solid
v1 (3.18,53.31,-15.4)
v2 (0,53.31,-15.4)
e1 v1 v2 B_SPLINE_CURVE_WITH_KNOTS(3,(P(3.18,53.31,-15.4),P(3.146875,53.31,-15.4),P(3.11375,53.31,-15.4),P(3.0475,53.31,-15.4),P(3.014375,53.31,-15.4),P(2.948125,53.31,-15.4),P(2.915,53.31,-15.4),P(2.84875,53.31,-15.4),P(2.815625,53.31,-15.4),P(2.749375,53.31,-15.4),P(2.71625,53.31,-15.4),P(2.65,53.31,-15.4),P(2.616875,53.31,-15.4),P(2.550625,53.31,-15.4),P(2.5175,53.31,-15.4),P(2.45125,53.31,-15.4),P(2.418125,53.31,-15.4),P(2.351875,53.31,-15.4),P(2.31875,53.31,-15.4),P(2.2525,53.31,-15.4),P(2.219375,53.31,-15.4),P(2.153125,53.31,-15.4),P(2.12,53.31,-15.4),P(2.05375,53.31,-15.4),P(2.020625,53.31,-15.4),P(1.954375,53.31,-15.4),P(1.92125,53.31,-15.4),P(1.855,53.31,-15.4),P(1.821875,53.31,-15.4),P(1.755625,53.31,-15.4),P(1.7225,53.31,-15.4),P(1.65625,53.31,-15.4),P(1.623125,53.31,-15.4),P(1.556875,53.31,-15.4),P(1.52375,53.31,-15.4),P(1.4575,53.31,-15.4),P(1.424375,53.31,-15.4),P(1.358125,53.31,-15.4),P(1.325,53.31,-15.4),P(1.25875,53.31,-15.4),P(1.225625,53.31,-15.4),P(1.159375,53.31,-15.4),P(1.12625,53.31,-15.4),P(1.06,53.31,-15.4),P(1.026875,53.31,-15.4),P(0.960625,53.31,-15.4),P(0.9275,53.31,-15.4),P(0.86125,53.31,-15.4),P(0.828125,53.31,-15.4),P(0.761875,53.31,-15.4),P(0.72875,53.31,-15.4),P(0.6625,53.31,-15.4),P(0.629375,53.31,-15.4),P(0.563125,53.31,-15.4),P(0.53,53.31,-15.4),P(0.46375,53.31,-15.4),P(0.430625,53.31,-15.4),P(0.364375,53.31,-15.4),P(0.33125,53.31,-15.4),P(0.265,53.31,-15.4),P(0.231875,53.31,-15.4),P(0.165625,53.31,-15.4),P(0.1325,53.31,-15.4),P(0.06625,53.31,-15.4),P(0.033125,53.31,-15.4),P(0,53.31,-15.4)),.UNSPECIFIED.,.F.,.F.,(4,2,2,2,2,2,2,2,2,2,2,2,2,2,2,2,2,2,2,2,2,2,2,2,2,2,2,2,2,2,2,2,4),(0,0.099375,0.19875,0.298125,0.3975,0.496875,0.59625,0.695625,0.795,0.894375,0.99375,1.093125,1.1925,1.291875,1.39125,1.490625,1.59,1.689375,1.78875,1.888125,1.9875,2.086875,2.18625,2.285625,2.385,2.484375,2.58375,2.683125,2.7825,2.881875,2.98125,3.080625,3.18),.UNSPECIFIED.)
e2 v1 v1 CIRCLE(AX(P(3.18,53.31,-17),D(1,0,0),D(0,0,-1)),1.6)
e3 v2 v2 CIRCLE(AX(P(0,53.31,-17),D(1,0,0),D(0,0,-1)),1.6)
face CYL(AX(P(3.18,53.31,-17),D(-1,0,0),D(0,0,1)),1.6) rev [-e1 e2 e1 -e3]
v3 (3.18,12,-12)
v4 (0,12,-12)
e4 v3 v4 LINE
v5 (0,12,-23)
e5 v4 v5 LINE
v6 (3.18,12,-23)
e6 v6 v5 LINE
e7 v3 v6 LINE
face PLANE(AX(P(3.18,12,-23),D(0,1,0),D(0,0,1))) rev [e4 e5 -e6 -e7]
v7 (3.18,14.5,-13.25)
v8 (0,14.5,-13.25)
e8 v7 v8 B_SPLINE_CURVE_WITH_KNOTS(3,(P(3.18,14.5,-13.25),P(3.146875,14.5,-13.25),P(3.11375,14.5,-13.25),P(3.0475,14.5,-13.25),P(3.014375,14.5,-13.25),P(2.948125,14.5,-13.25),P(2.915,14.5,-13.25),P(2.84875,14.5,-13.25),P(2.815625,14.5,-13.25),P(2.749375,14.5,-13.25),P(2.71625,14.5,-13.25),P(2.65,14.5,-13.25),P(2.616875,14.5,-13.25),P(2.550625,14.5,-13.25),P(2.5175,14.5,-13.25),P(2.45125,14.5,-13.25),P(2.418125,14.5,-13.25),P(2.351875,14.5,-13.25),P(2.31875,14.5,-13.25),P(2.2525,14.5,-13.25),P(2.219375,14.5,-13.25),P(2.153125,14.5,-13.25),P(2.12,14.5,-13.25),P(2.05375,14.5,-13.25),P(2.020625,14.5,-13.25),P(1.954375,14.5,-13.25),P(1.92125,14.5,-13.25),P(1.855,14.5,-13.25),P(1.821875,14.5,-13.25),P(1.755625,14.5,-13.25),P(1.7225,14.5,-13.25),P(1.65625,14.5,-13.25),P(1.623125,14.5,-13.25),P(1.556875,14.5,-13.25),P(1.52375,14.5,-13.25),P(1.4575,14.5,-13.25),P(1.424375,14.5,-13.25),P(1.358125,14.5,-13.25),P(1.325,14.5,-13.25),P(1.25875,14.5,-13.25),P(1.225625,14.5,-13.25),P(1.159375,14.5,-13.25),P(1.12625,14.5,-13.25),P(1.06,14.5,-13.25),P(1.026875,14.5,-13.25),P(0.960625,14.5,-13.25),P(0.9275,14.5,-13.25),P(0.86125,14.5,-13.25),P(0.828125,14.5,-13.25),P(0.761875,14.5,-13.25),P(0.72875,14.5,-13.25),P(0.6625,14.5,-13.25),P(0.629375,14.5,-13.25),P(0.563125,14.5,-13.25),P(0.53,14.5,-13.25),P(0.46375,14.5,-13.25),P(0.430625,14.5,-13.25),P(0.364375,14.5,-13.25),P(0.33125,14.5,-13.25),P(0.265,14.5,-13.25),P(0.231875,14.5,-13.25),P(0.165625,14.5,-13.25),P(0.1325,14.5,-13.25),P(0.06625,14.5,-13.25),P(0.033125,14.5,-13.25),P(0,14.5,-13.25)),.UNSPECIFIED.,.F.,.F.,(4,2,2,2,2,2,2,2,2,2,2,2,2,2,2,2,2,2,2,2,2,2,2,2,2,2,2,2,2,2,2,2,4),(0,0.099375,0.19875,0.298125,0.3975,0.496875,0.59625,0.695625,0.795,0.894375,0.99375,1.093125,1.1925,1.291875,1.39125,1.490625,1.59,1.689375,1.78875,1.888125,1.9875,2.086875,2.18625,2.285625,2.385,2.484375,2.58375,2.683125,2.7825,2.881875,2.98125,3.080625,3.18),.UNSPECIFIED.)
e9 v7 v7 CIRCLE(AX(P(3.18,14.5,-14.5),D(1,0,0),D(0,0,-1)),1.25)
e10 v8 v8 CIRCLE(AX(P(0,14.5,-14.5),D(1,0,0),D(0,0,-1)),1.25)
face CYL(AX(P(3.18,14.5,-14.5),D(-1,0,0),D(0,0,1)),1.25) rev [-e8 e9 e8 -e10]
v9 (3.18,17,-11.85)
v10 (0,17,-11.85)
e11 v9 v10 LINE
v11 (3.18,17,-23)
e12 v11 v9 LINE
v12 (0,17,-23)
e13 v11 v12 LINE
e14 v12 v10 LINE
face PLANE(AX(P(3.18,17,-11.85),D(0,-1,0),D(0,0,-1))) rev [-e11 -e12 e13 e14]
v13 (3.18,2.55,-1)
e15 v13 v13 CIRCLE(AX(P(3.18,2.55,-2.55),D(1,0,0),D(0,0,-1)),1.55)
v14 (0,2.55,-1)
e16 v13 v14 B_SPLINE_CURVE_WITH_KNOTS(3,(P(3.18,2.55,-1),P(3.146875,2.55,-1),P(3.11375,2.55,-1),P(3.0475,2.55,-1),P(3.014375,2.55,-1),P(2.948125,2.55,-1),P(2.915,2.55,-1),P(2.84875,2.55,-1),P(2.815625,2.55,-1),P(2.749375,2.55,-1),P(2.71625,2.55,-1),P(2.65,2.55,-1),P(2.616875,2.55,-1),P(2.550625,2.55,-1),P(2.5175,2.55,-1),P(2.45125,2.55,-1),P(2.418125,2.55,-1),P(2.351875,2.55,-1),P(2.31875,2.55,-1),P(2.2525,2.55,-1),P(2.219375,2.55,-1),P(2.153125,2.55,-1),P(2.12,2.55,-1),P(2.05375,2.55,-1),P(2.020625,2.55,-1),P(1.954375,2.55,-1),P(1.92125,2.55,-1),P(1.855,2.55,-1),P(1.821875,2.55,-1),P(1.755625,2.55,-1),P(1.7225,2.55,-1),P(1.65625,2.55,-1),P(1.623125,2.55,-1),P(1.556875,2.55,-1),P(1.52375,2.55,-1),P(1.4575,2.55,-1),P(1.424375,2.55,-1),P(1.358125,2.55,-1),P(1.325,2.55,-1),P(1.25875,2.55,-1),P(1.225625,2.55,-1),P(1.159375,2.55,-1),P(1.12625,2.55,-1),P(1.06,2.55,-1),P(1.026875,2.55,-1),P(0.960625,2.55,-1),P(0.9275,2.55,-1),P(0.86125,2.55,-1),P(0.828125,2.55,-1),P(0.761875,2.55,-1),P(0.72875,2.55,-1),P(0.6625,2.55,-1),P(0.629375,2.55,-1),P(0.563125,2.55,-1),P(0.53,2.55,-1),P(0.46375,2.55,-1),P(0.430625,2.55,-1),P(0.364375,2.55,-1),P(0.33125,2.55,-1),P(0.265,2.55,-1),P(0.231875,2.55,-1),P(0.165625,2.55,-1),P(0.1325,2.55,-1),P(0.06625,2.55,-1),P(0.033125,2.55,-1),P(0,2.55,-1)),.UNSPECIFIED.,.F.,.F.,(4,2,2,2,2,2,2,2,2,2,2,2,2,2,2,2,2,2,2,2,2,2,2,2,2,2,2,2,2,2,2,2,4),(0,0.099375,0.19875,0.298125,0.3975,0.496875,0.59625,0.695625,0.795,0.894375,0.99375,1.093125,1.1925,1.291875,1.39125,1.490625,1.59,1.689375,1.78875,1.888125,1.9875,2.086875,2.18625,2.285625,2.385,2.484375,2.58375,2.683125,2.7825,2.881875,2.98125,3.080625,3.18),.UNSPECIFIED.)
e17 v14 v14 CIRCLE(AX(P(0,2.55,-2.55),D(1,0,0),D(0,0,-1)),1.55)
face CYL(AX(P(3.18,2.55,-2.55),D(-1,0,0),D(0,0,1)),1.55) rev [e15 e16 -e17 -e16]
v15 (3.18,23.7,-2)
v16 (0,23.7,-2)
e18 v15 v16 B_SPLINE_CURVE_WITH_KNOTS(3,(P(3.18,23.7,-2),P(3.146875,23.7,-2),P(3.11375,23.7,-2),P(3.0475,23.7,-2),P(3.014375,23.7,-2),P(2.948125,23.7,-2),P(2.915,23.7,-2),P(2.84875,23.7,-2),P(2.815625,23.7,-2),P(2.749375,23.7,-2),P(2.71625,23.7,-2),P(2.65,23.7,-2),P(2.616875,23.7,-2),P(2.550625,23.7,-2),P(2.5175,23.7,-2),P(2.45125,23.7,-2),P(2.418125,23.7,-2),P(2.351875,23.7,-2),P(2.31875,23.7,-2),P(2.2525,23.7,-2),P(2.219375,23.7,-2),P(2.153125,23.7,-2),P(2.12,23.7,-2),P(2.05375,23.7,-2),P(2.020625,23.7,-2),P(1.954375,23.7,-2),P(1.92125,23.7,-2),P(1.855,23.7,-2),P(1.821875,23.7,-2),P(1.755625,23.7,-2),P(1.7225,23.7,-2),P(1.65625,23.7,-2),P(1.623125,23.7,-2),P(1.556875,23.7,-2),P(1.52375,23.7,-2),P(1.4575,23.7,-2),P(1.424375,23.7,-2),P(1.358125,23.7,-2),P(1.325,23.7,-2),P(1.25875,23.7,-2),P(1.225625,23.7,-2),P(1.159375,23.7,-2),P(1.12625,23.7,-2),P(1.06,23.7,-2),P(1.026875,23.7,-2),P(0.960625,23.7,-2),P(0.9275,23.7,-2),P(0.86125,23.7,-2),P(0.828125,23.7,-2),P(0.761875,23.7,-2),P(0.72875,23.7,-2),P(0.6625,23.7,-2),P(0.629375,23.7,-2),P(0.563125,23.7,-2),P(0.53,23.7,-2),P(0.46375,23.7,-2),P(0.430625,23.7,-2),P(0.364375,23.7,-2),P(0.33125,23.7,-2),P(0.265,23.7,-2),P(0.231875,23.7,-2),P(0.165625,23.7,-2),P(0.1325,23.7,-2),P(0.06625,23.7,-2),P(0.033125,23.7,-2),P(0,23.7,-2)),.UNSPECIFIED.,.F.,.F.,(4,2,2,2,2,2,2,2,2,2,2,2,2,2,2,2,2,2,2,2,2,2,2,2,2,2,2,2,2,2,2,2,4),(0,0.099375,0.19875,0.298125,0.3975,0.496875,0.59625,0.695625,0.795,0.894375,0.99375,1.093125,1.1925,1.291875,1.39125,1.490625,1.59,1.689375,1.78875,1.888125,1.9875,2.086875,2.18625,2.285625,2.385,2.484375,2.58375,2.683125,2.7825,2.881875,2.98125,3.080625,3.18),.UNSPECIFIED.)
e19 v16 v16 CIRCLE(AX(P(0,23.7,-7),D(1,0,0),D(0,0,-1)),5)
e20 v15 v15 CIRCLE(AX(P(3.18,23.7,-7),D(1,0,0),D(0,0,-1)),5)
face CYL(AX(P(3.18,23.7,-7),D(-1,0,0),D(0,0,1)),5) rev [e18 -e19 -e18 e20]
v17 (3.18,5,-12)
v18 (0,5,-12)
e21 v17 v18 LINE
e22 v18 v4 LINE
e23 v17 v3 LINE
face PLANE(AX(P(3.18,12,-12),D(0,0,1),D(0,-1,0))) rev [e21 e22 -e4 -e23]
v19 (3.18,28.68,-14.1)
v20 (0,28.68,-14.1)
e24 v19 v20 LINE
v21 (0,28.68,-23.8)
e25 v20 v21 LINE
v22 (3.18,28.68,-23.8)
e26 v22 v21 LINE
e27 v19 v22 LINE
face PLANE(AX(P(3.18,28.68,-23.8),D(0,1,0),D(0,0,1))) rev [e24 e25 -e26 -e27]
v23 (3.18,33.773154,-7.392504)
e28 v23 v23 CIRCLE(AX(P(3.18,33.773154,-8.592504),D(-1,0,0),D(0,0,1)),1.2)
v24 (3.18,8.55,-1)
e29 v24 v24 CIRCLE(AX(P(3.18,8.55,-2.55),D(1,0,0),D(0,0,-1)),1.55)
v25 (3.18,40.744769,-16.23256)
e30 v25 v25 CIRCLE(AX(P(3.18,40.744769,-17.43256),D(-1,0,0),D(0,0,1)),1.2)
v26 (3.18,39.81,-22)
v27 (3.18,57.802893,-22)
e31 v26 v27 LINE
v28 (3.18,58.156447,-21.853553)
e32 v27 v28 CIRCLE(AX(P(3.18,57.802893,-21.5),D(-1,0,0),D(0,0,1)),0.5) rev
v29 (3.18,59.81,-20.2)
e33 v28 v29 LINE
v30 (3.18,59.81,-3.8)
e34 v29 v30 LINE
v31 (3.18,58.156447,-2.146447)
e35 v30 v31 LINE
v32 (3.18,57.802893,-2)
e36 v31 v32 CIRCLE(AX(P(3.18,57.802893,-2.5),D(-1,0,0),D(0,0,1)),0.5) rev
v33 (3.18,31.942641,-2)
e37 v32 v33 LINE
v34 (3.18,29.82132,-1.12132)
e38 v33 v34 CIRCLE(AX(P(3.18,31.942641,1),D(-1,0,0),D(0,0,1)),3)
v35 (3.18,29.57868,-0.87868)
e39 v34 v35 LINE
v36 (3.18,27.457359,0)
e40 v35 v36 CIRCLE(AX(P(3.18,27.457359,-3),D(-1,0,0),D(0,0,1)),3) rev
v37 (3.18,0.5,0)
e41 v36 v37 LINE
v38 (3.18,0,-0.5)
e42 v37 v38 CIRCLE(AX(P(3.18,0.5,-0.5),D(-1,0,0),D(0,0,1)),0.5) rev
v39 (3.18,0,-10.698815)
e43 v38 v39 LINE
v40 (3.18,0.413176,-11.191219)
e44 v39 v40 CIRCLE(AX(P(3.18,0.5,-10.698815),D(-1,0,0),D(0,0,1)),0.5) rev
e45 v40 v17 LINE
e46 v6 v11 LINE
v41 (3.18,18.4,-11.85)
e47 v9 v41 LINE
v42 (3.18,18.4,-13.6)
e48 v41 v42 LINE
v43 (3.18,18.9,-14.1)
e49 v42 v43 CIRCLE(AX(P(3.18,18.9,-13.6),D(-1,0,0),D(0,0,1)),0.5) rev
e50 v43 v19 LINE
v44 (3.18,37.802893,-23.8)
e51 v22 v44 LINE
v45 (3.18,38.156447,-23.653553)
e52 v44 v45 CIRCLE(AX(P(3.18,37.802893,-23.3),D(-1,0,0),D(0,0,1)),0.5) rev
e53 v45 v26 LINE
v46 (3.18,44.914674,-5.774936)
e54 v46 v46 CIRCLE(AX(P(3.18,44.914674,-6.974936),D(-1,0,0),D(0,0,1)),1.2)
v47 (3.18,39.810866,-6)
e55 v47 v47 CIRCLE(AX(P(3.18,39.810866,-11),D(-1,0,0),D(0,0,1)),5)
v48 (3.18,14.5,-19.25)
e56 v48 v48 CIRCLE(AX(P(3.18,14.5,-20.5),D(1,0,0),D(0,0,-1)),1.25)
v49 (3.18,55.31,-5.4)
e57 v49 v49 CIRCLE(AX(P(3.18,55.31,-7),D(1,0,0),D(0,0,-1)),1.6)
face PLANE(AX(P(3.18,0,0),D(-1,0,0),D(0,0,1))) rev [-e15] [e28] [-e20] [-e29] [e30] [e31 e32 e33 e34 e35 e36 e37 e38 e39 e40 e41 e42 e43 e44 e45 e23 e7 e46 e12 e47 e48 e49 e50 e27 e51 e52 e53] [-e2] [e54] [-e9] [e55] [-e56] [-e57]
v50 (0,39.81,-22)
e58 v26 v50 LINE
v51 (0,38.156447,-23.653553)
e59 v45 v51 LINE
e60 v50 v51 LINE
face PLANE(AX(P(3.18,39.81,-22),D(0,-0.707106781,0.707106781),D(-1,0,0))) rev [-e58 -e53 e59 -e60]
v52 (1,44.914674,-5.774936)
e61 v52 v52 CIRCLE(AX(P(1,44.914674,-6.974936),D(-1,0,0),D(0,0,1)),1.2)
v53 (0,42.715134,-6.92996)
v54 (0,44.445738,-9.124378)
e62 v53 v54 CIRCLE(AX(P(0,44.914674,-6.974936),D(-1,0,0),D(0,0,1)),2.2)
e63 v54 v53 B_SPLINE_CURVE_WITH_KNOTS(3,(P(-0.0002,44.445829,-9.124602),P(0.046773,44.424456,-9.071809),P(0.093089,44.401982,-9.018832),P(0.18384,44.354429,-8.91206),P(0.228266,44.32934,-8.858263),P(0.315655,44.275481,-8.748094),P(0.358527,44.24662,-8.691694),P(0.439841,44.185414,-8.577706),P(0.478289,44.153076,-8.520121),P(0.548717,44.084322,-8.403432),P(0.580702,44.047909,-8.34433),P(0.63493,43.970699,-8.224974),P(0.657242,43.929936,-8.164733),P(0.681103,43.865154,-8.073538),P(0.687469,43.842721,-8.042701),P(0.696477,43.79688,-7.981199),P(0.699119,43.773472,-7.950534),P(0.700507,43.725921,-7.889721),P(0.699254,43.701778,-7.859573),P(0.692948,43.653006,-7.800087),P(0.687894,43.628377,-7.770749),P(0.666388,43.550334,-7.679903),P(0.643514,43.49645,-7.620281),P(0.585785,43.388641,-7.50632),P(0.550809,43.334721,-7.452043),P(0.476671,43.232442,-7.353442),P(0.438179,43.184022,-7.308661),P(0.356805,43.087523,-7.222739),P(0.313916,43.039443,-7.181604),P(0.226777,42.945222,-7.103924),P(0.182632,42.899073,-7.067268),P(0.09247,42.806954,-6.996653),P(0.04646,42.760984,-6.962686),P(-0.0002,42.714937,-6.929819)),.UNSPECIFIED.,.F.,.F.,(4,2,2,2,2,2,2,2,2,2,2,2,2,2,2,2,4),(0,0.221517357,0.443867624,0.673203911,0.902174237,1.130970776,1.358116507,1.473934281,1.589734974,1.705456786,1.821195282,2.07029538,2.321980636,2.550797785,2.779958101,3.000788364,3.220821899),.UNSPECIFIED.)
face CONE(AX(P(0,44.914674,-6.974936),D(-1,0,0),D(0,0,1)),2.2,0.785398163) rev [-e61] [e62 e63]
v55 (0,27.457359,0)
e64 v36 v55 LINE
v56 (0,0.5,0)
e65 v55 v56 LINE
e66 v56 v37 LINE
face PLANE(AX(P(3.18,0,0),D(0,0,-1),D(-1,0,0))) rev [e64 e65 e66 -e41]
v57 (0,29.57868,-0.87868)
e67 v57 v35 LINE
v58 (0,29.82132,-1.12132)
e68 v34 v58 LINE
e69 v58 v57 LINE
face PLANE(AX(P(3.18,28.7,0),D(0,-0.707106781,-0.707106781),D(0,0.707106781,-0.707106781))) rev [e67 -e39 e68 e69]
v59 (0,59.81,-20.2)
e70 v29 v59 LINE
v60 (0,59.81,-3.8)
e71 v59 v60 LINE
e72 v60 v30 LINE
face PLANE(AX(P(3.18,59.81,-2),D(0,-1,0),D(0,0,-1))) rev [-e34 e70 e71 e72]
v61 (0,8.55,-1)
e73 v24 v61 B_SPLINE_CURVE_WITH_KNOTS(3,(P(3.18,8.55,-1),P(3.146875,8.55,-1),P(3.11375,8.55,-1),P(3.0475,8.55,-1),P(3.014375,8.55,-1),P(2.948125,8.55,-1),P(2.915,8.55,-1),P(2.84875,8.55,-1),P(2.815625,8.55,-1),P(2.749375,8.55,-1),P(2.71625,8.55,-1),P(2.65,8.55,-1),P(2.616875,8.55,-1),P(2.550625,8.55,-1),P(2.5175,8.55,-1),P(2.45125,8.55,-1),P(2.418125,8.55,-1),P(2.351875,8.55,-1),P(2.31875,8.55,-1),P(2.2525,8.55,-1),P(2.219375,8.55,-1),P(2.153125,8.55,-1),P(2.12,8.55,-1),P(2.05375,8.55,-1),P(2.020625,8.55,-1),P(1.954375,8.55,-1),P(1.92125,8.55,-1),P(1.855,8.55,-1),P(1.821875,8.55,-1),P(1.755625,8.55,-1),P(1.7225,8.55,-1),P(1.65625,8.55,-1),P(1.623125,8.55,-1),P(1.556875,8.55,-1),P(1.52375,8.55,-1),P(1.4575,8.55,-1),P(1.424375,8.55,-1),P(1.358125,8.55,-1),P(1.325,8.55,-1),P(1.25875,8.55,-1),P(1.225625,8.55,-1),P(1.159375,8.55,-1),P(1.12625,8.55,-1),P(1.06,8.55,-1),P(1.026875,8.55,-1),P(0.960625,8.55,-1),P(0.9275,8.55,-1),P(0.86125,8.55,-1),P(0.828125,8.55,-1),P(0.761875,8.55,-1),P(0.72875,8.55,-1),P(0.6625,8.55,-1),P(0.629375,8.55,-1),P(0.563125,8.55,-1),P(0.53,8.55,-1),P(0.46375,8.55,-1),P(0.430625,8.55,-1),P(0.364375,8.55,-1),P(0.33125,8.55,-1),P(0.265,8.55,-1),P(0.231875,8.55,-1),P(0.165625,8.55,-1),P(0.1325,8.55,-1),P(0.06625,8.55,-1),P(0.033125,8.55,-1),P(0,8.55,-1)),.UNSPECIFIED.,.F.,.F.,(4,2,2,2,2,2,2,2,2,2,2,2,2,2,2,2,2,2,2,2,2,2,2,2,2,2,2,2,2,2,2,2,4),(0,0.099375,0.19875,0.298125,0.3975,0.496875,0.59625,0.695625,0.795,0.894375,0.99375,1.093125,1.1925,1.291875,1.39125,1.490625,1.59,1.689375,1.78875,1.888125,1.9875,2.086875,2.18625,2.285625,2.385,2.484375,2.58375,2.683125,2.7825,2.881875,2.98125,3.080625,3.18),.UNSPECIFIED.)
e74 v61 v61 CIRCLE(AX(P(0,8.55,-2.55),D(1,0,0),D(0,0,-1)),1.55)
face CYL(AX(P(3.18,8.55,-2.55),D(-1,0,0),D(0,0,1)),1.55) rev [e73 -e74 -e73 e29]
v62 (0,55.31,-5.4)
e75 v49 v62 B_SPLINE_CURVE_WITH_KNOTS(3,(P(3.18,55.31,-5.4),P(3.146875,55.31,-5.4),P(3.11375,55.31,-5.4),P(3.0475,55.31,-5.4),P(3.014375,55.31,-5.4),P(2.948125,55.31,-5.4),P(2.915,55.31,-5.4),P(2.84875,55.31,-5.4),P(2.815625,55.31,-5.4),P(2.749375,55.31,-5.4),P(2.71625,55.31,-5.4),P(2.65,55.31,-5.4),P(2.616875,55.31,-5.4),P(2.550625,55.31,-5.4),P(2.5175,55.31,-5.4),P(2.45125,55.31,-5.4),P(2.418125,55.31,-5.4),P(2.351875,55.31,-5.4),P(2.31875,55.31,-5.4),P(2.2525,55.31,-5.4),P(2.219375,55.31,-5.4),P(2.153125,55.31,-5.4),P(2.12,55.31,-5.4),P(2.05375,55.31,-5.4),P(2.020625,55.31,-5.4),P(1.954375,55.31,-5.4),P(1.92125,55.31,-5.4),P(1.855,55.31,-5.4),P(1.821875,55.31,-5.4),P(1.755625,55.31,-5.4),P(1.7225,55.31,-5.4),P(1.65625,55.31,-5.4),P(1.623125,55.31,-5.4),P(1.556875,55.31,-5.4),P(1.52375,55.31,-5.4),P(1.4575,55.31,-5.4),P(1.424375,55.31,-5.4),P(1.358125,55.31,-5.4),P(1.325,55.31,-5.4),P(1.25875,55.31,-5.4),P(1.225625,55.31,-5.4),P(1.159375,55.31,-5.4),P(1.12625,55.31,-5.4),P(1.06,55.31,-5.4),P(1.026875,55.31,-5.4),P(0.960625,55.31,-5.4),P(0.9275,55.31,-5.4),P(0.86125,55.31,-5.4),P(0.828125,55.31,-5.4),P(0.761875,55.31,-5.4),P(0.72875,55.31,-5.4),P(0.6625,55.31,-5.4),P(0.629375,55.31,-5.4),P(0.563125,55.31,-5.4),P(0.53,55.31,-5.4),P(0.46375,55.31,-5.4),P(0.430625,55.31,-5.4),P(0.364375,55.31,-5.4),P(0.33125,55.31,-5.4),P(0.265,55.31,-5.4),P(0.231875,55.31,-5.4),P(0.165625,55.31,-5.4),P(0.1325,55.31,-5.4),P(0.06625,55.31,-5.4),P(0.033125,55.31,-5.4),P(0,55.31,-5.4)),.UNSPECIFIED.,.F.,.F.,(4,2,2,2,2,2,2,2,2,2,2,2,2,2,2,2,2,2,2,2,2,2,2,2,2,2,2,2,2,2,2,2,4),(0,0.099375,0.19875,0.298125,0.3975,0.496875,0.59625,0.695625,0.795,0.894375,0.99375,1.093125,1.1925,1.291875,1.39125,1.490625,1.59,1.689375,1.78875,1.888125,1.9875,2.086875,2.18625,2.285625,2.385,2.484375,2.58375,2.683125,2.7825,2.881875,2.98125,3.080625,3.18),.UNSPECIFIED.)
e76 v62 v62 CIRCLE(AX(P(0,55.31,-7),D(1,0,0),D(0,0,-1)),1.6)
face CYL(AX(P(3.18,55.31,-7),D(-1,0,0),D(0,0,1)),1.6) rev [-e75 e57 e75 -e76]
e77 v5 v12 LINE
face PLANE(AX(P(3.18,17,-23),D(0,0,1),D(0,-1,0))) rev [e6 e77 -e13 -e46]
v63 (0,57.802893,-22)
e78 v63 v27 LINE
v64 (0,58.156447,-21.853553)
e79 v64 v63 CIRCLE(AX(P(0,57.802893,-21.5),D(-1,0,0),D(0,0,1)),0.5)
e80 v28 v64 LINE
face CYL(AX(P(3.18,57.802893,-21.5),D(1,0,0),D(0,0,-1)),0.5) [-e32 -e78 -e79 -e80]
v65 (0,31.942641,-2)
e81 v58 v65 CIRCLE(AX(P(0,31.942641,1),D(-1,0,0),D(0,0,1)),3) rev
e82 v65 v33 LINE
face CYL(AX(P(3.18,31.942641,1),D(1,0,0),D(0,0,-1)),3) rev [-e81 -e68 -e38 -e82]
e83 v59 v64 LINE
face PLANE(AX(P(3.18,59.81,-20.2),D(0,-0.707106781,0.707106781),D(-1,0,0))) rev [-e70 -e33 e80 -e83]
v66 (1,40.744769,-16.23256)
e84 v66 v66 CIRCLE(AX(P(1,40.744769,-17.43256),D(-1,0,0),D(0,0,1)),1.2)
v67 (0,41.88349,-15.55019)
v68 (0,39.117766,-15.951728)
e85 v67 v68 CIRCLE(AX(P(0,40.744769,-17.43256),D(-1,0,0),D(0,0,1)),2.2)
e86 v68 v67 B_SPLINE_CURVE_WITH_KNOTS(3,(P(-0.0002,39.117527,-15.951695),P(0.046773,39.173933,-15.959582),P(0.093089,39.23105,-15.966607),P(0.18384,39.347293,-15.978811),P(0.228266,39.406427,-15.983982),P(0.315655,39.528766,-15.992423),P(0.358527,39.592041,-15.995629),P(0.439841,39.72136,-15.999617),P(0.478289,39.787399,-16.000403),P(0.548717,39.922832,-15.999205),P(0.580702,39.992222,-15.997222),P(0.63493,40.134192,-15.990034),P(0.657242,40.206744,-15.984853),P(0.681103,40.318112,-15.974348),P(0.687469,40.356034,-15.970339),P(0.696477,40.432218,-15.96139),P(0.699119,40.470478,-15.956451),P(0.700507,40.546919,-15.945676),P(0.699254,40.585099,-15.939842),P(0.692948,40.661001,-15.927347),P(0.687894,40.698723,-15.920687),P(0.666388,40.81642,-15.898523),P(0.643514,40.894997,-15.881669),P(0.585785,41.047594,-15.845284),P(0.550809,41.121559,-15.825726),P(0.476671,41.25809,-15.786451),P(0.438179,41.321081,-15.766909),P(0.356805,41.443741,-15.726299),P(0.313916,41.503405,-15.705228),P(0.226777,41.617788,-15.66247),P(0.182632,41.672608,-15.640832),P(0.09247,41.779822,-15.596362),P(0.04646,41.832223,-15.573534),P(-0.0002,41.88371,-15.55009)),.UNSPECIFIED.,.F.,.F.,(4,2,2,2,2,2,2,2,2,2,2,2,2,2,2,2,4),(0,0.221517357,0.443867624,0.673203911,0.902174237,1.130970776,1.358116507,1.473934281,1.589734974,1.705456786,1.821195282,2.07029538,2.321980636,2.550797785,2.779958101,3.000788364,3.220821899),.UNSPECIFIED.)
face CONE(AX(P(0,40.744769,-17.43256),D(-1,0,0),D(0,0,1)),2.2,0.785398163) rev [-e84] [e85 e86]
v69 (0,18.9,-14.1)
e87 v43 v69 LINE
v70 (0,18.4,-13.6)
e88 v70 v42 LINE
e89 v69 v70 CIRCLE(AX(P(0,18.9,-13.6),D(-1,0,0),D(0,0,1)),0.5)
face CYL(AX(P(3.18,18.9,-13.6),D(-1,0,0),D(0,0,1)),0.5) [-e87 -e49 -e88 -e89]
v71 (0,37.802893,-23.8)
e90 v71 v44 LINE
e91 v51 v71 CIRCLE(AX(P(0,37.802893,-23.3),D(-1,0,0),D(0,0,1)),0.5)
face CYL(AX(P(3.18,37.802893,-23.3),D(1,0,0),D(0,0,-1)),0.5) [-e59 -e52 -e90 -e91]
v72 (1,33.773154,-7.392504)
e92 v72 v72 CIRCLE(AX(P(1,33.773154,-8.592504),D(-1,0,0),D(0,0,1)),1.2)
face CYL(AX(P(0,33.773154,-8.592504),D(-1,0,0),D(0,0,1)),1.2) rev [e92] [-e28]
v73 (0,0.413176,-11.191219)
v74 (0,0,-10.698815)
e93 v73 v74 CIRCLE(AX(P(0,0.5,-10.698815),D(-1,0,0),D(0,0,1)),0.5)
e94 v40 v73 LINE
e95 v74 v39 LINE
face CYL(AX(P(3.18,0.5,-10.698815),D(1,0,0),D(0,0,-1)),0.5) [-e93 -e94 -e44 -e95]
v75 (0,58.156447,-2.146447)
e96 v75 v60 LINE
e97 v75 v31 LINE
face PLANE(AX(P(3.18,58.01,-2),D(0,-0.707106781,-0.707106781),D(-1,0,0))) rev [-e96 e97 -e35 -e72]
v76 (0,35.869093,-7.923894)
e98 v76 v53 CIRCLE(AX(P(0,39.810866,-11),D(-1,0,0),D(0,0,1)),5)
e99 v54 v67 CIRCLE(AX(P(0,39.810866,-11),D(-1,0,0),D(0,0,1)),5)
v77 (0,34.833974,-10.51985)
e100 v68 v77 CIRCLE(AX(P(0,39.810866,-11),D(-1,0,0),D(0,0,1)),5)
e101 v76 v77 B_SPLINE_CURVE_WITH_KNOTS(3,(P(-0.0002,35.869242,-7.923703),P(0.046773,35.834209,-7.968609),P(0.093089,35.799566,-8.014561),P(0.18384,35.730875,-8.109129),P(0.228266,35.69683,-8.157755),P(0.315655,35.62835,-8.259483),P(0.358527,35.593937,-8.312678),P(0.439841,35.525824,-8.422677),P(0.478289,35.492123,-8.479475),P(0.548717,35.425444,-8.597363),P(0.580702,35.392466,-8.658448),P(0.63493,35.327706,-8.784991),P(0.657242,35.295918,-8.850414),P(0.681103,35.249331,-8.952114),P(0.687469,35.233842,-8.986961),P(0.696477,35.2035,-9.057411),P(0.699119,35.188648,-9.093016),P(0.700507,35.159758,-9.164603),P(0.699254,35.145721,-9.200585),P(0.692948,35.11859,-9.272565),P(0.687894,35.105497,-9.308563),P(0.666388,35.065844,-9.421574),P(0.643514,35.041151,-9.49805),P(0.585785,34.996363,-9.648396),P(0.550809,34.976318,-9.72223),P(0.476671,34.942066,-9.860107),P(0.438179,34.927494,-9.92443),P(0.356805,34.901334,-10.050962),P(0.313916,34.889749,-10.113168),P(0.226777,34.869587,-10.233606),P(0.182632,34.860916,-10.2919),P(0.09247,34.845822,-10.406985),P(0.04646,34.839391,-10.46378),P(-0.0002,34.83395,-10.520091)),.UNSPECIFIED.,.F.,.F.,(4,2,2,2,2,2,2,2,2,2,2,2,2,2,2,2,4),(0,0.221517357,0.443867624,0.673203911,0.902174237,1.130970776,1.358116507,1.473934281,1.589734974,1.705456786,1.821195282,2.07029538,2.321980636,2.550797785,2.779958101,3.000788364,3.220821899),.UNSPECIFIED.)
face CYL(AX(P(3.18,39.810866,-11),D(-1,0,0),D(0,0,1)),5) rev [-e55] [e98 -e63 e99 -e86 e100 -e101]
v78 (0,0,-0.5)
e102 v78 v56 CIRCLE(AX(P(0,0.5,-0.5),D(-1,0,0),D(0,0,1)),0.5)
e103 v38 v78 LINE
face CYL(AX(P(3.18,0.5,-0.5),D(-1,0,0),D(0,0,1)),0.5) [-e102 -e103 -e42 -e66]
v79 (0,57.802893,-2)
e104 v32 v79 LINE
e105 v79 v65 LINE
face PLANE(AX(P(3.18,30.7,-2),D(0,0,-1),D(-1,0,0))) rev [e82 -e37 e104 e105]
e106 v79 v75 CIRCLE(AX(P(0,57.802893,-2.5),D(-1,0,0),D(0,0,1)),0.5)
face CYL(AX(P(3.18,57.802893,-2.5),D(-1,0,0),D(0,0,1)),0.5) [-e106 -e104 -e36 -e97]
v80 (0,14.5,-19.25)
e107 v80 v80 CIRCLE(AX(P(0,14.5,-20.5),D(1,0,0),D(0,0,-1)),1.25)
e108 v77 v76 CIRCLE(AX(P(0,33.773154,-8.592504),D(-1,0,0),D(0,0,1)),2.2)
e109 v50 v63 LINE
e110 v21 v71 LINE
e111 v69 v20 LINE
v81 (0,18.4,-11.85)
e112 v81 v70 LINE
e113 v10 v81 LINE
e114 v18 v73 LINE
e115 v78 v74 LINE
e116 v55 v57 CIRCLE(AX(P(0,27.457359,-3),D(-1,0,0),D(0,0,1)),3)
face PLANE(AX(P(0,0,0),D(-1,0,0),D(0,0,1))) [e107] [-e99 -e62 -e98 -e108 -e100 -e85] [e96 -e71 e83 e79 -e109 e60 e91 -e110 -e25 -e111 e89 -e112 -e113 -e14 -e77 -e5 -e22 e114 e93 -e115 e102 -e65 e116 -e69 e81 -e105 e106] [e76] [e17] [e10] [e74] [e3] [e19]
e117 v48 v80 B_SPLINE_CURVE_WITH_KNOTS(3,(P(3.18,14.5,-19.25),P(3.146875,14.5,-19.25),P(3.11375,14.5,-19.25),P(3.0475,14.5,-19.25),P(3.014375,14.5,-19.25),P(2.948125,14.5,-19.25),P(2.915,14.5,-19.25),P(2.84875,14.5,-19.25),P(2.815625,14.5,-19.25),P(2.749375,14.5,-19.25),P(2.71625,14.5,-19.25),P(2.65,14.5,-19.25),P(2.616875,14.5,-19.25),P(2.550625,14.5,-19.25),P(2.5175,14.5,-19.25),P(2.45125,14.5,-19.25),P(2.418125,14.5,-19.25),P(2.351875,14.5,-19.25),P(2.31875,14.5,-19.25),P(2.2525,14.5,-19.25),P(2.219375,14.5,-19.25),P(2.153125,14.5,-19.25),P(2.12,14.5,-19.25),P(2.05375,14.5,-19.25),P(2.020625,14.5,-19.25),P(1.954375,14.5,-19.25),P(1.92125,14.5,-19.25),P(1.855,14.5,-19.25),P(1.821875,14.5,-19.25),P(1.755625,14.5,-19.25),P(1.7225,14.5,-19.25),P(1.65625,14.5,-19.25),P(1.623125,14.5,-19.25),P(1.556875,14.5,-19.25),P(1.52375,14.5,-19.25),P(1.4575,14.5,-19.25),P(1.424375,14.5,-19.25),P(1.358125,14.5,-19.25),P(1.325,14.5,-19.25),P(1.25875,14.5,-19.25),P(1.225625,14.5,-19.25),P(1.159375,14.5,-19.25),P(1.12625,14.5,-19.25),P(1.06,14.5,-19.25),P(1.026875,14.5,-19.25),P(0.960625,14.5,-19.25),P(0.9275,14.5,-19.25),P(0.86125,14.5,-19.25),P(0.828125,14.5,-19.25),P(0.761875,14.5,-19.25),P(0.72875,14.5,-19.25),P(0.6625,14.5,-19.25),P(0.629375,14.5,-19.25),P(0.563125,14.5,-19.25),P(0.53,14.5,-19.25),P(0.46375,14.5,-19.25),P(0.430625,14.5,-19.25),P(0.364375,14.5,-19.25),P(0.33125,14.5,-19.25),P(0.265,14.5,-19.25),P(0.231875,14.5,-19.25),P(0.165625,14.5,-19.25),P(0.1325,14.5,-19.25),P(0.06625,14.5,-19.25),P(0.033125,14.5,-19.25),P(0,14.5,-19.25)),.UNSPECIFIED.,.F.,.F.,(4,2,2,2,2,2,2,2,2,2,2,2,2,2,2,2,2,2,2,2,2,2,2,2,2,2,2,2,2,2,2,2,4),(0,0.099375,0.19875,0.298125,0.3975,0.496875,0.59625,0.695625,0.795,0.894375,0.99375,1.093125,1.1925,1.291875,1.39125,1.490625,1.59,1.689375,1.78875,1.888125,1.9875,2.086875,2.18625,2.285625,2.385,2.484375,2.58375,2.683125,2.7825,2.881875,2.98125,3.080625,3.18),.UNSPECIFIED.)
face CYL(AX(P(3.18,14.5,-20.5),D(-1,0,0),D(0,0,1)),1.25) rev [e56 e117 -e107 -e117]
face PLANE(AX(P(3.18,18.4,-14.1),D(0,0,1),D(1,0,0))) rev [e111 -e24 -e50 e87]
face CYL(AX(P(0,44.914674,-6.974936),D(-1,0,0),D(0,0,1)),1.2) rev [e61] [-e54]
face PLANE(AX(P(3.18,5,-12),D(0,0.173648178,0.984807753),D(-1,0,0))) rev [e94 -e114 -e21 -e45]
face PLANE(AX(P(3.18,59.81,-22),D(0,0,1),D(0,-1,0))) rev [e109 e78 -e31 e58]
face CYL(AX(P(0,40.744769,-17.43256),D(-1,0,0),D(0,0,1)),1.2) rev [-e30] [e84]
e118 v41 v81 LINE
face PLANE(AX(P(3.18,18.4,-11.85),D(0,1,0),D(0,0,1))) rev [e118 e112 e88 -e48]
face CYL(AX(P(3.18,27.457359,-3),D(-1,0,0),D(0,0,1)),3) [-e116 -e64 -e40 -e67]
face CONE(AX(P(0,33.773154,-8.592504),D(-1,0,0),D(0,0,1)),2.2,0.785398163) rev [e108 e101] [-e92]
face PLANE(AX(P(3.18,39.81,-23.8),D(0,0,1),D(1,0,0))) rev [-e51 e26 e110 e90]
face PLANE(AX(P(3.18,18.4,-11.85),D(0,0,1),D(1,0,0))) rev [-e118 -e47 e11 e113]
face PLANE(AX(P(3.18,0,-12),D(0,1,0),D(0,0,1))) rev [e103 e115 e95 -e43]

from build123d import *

# Parameters (mm, degrees)
SKETCH1_R                                       = 5
SKETCH1_R_2                                     = 1.6
SKETCH1_R_3                                     = 1.25
SKETCH1_R_4                                     = 1.55
BOSS_EXTRUDE1_DEPTH                             = 3.18
CHAMFER1_SIZE                                   = 5
CHAMFER1_SIZE2                                  = 0.881634904
CSK_FOR_M2_FLAT_HEAD_MACHINE_SCREW1_D           = 2.4
CSK_FOR_M2_FLAT_HEAD_MACHINE_SCREW1_DEPTH       = 3.508967257
CSK_FOR_M2_FLAT_HEAD_MACHINE_SCREW1_CSINK_D     = 4.4
CSK_FOR_M2_FLAT_HEAD_MACHINE_SCREW1_CSINK_ANGLE = 90
CSK_FOR_M2_FLAT_HEAD_MACHINE_SCREW1_TIP         = 0.721032743
SKETCH3_R                                       = 5
CUT_EXTRUDE4_DEPTH                              = 65.449891389
FILLET2_R                                       = 3
CHAMFER2_SIZE                                   = 1.8
FILLET4_R                                       = 0.5


with BuildPart() as part:
    # Sketch1 → Boss-Extrude1 (new body)
    with BuildSketch(Plane(origin=(0, 0, 0), x_dir=(0, 0, -1), z_dir=(1, 0, 0))):
        Polygon((0, 0), (0, 28.7), (2, 30.7), (2, 59.81), (22, 59.81), (22, 39.81), (23.8, 39.81), (23.8, 28.68), (14.1, 28.68), (14.1, 18.4), (11.85, 18.4), (11.85, 17), (23, 17), (23, 12), (12, 12), (12, 0), align=None)
        with Locations(Location((7, 23.7, 0), (0, 0, 180))):
            Circle(SKETCH1_R, mode=Mode.SUBTRACT)
        with Locations(Location((7, 55.31, 0), (0, 0, 180))):
            Circle(SKETCH1_R_2, mode=Mode.SUBTRACT)
        with Locations(Location((17, 53.31, 0), (0, 0, 180))):
            Circle(SKETCH1_R_2, mode=Mode.SUBTRACT)
        with Locations(Location((20.5, 14.5, 0), (0, 0, 180))):
            Circle(SKETCH1_R_3, mode=Mode.SUBTRACT)
        with Locations(Location((14.5, 14.5, 0), (0, 0, 180))):
            Circle(SKETCH1_R_3, mode=Mode.SUBTRACT)
        with Locations(Location((2.55, 2.55, 0), (0, 0, 180))):
            Circle(SKETCH1_R_4, mode=Mode.SUBTRACT)
        with Locations(Location((2.55, 8.55, 0), (0, 0, 180))):
            Circle(SKETCH1_R_4, mode=Mode.SUBTRACT)
    extrude(amount=BOSS_EXTRUDE1_DEPTH)

    # Chamfer1
    chamfer1_edges = [part.edges().sort_by_distance(p)[0] for p in [
        (1.59, 0, -12),
    ]]
    chamfer1_side = [part.faces().sort_by_distance(p)[0] for p in [
        (1.59, 6, -12),
    ]]
    chamfer(chamfer1_edges, length=CHAMFER1_SIZE, length2=CHAMFER1_SIZE2, reference=chamfer1_side[0])

    # CSK for M2 Flat Head Machine Screw1
    with Locations(Plane.ZY):
        with Locations((-6.974936087, 44.914674329), (-17.432559713, 40.744769284), (-8.592504199, 33.773154083)):
            CounterSinkHole(CSK_FOR_M2_FLAT_HEAD_MACHINE_SCREW1_D / 2, CSK_FOR_M2_FLAT_HEAD_MACHINE_SCREW1_CSINK_D / 2, depth=CSK_FOR_M2_FLAT_HEAD_MACHINE_SCREW1_DEPTH, counter_sink_angle=CSK_FOR_M2_FLAT_HEAD_MACHINE_SCREW1_CSINK_ANGLE)
            with Locations((0, 0, -(CSK_FOR_M2_FLAT_HEAD_MACHINE_SCREW1_DEPTH + CSK_FOR_M2_FLAT_HEAD_MACHINE_SCREW1_TIP / 2))):  # 118° drill point
                Cone(0, CSK_FOR_M2_FLAT_HEAD_MACHINE_SCREW1_D / 2, CSK_FOR_M2_FLAT_HEAD_MACHINE_SCREW1_TIP, mode=Mode.SUBTRACT)

    # Sketch3 → Cut-Extrude4 (cut, through all)
    with BuildSketch(Plane.ZY):
        with Locations((-11, 39.810865899)):
            Circle(SKETCH3_R)
    extrude(amount=-CUT_EXTRUDE4_DEPTH, mode=Mode.SUBTRACT)

    # Fillet2
    fillet2_edges = [part.edges().sort_by_distance(p)[0] for p in [
        (1.59, 28.7, 0),
        (1.59, 30.7, -2),
    ]]
    fillet(fillet2_edges, radius=FILLET2_R)

    # Chamfer2
    chamfer2_edges = [part.edges().sort_by_distance(p)[0] for p in [
        (1.59, 59.81, -22),
        (1.59, 59.81, -2),
        (1.59, 39.81, -23.8),
    ]]
    chamfer(chamfer2_edges, length=CHAMFER2_SIZE - 0.0001)  # a hair under: the kernel refuses the full size

    # Fillet4
    fillet4_edges = [part.edges().sort_by_distance(p)[0] for p in [
        (1.59, 38.0101, -23.8),
        (1.59, 58.0101, -22),
        (1.59, 58.0101, -2),
        (1.59, 0, 0),
        (1.59, 18.4, -14.1),
        (1.59, 0, -11.118365096),
    ]]
    fillet(fillet4_edges, radius=FILLET4_R)


solid = part.part
